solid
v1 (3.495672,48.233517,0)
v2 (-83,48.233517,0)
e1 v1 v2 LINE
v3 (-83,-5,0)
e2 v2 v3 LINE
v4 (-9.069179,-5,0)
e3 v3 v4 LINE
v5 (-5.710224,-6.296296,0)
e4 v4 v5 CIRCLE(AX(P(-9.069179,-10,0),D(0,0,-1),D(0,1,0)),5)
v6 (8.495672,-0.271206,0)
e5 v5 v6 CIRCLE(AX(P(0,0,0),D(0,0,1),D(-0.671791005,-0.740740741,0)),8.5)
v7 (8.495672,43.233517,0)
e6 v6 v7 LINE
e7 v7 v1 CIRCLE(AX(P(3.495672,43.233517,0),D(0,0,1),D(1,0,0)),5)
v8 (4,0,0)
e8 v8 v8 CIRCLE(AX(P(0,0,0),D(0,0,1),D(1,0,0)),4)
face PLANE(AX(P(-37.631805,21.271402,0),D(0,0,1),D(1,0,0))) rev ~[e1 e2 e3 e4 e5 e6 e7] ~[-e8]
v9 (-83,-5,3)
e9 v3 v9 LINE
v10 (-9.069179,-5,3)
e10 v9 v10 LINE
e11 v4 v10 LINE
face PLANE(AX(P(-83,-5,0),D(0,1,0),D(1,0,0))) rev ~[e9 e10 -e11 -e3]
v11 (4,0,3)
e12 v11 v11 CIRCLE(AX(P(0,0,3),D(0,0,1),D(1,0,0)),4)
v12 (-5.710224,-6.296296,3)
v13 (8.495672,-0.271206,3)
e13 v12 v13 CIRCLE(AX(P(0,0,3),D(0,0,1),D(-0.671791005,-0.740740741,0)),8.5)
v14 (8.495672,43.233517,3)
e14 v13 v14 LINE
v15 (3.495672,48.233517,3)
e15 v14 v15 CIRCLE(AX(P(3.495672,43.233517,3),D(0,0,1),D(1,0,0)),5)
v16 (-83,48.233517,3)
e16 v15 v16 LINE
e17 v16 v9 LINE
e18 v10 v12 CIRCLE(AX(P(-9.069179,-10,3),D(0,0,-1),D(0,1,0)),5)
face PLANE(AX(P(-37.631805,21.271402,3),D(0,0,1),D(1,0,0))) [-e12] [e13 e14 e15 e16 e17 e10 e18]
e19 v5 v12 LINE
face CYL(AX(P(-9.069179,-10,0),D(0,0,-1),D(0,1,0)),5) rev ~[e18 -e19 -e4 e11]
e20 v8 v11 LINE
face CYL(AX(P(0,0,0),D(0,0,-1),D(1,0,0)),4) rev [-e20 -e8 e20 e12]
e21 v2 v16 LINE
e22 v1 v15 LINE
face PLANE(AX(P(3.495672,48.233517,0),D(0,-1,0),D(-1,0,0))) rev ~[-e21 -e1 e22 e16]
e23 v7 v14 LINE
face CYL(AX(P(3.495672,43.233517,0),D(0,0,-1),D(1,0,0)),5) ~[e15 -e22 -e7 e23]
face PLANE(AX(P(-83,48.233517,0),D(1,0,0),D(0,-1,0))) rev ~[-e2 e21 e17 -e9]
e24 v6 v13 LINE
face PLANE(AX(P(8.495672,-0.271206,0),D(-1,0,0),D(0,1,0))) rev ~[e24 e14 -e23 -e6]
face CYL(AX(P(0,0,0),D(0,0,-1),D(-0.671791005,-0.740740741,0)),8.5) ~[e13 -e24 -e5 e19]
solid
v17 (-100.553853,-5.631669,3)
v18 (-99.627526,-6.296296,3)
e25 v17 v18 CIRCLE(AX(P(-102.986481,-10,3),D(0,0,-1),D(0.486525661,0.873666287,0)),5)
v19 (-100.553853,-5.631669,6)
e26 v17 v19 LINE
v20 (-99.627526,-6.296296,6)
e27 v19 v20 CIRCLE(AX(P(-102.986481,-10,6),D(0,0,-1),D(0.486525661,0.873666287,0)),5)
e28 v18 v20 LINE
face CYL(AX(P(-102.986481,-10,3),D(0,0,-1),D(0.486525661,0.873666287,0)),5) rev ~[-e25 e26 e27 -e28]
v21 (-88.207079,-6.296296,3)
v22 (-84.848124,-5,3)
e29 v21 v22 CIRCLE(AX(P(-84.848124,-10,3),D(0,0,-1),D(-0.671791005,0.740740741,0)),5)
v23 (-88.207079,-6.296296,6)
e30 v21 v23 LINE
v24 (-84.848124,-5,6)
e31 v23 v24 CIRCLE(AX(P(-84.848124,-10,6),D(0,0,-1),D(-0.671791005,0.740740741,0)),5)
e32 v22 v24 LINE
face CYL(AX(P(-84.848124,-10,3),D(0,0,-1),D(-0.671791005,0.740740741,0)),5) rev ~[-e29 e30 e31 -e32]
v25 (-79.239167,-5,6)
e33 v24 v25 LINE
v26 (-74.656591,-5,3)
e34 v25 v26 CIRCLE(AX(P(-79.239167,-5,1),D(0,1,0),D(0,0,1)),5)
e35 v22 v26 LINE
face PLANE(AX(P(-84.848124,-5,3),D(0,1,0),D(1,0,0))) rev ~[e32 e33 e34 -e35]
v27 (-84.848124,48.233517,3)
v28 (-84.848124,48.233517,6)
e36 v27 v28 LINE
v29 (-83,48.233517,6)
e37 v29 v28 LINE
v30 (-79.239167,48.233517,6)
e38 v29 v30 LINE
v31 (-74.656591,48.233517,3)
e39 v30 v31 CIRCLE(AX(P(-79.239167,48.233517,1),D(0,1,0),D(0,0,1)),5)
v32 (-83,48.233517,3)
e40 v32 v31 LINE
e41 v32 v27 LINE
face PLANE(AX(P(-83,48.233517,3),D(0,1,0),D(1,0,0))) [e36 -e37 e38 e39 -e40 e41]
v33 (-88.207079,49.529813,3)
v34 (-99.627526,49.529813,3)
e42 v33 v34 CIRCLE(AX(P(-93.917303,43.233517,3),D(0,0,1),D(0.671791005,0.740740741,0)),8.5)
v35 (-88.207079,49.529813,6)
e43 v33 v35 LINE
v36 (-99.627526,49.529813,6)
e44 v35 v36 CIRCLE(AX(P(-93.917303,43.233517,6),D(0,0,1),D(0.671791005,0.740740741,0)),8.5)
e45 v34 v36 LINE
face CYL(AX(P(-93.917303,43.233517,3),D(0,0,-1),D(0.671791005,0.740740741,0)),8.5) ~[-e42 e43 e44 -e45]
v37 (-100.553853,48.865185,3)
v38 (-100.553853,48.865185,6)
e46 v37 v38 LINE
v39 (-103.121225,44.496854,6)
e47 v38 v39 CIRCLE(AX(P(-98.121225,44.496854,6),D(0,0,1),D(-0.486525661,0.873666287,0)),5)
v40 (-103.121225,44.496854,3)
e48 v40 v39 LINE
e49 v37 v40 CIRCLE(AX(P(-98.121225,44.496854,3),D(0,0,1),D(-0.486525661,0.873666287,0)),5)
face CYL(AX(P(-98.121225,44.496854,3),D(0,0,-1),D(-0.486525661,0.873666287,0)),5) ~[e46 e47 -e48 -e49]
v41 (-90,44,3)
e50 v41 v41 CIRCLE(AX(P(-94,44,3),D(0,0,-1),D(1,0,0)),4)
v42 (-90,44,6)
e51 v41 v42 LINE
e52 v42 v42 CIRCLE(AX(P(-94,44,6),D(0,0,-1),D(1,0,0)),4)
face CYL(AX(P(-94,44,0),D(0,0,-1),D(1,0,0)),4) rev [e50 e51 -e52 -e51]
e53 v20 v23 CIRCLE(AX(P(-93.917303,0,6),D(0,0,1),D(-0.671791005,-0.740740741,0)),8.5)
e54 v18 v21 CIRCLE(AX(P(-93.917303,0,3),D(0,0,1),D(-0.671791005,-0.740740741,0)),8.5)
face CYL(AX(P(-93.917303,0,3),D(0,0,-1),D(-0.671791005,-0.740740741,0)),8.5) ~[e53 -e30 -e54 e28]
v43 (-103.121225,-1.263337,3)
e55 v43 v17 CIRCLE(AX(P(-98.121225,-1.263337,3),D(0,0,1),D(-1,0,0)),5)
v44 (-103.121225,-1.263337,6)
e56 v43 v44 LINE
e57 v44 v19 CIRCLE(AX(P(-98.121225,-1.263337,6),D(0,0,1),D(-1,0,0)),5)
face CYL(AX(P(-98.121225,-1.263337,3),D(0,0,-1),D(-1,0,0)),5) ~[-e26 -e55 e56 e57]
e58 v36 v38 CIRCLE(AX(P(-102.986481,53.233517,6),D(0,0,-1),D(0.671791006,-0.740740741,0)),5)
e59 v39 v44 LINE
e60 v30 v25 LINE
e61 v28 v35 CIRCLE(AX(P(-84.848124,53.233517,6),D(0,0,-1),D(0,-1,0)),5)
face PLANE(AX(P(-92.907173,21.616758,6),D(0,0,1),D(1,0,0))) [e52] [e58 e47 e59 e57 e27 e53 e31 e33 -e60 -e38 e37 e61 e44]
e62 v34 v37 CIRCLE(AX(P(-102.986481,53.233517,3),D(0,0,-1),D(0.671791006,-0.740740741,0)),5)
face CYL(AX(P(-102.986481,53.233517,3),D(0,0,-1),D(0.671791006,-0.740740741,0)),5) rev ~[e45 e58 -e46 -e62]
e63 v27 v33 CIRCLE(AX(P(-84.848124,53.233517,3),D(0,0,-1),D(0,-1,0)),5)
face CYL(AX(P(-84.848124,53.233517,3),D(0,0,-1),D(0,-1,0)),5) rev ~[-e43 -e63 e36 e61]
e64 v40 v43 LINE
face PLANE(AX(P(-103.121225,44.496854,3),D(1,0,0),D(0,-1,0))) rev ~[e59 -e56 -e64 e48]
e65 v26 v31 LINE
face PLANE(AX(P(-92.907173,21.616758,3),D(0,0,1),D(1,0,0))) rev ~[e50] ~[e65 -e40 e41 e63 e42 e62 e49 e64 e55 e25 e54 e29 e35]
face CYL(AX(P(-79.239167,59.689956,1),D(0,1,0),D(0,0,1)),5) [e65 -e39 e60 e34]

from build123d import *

# Parameters (mm, degrees)
F0_R        = 4
F1_DEPTH    = 3
F2_W        = 8.3434091806
F2_H        = 53.2335165143
F3_DEPTH    = 3
F4_DEPTH    = 25
F5_T1_DEPTH = 76.1463949891


# Not quite as in the source:
# - a fillet or chamfer that OpenCascade refuses, or shapes differently, is made with other operations: its cross-section is extruded or revolved along the edge and cut away or added


with BuildPart() as f1:
    # F0 (on Top) → F1 (new body)
    with BuildSketch(Plane.XY):
        with BuildLine():
            ThreePointArc((-9.0691785736, -5), (-7.2689728241, -5.3353178823), (-5.7102235463, -6.2962962963))
            ThreePointArc((-5.7102235463, -6.2962962963), (3.3189020375, -7.8252724723), (8.495672283, -0.2712055688))
            Line((8.495672283, -0.2712055688), (8.495672283, 0.2712055688))
            Line((8.495672283, 0.2712055688), (8.495672283, 43.2335165143))
            ThreePointArc((8.495672283, 43.2335165143), (7.0312061889, 46.7690504202), (3.495672283, 48.2335165143))
            Line((3.495672283, 48.2335165143), (-83, 48.2335165143))
            Line((-83, 48.2335165143), (-83, -5))
            Line((-83, -5), (-9.0691785736, -5))
        make_face()
        Circle(F0_R, mode=Mode.SUBTRACT)
    extrude(amount=F1_DEPTH)


with BuildPart() as f3:
    # F2 (on face) → F3 (new body)
    with BuildSketch(Plane.XY.offset(3)):
        with BuildLine():
            Line((-84.8481242137, -5), (-83, -5))
            Line((-83, -5), (-83, 48.2335165143))
            Line((-83, 48.2335165143), (-84.8481242137, 48.2335165143))
            ThreePointArc((-84.8481242137, 48.2335165143), (-86.6483299633, 48.5688343966), (-88.207079241, 49.5298128106))
            ThreePointArc((-88.207079241, 49.5298128106), (-93.9173027873, 51.7335165143), (-99.6275263337, 49.5298128106))
            ThreePointArc((-99.6275263337, 49.5298128106), (-100.071684304, 49.1710101306), (-100.5538530546, 48.8651850796))
            ThreePointArc((-100.5538530546, 48.8651850796), (-102.4318593611, 47.0303155519), (-103.1212247482, 44.496853645))
            Line((-103.1212247482, 44.496853645), (-103.1212247482, -1.2633371307))
            ThreePointArc((-103.1212247482, -1.2633371307), (-102.4318593611, -3.7967990376), (-100.5538530546, -5.6316685653))
            ThreePointArc((-100.5538530546, -5.6316685653), (-100.071684304, -5.9374936163), (-99.6275263337, -6.2962962963))
            ThreePointArc((-99.6275263337, -6.2962962963), (-93.9173027873, -8.5), (-88.207079241, -6.2962962963))
            ThreePointArc((-88.207079241, -6.2962962963), (-86.6483299633, -5.3353178823), (-84.8481242137, -5))
        make_face()
        with Locations((-78.8282954097, 21.6167582572)):
            Rectangle(F2_W, F2_H)
    extrude(amount=F3_DEPTH)

    # F0 (on Top) → F4 (cut)
    with BuildSketch(Plane.XY):
        with Locations((-94, 44)):
            Circle(F0_R)
    extrude(amount=F4_DEPTH, mode=Mode.SUBTRACT)

    # F5: fillet of radius 5 on 1 edges, made by hand

    # F5_s2 → F5_t1 (cut)
    with BuildSketch(Plane.XZ.offset(-59.6899557517)):
        with BuildLine():
            ThreePointArc((-79.2391665143, 6), (-76.5005537268, 5.1833001327), (-74.6565908194, 3))
            Line((-74.6565908194, 3), (-74.6565908194, 6))
            Line((-74.6565908194, 6), (-79.2391665143, 6))
        make_face()
    extrude(amount=F5_T1_DEPTH, mode=Mode.SUBTRACT)


solid = Compound([f1.part, f3.part])
